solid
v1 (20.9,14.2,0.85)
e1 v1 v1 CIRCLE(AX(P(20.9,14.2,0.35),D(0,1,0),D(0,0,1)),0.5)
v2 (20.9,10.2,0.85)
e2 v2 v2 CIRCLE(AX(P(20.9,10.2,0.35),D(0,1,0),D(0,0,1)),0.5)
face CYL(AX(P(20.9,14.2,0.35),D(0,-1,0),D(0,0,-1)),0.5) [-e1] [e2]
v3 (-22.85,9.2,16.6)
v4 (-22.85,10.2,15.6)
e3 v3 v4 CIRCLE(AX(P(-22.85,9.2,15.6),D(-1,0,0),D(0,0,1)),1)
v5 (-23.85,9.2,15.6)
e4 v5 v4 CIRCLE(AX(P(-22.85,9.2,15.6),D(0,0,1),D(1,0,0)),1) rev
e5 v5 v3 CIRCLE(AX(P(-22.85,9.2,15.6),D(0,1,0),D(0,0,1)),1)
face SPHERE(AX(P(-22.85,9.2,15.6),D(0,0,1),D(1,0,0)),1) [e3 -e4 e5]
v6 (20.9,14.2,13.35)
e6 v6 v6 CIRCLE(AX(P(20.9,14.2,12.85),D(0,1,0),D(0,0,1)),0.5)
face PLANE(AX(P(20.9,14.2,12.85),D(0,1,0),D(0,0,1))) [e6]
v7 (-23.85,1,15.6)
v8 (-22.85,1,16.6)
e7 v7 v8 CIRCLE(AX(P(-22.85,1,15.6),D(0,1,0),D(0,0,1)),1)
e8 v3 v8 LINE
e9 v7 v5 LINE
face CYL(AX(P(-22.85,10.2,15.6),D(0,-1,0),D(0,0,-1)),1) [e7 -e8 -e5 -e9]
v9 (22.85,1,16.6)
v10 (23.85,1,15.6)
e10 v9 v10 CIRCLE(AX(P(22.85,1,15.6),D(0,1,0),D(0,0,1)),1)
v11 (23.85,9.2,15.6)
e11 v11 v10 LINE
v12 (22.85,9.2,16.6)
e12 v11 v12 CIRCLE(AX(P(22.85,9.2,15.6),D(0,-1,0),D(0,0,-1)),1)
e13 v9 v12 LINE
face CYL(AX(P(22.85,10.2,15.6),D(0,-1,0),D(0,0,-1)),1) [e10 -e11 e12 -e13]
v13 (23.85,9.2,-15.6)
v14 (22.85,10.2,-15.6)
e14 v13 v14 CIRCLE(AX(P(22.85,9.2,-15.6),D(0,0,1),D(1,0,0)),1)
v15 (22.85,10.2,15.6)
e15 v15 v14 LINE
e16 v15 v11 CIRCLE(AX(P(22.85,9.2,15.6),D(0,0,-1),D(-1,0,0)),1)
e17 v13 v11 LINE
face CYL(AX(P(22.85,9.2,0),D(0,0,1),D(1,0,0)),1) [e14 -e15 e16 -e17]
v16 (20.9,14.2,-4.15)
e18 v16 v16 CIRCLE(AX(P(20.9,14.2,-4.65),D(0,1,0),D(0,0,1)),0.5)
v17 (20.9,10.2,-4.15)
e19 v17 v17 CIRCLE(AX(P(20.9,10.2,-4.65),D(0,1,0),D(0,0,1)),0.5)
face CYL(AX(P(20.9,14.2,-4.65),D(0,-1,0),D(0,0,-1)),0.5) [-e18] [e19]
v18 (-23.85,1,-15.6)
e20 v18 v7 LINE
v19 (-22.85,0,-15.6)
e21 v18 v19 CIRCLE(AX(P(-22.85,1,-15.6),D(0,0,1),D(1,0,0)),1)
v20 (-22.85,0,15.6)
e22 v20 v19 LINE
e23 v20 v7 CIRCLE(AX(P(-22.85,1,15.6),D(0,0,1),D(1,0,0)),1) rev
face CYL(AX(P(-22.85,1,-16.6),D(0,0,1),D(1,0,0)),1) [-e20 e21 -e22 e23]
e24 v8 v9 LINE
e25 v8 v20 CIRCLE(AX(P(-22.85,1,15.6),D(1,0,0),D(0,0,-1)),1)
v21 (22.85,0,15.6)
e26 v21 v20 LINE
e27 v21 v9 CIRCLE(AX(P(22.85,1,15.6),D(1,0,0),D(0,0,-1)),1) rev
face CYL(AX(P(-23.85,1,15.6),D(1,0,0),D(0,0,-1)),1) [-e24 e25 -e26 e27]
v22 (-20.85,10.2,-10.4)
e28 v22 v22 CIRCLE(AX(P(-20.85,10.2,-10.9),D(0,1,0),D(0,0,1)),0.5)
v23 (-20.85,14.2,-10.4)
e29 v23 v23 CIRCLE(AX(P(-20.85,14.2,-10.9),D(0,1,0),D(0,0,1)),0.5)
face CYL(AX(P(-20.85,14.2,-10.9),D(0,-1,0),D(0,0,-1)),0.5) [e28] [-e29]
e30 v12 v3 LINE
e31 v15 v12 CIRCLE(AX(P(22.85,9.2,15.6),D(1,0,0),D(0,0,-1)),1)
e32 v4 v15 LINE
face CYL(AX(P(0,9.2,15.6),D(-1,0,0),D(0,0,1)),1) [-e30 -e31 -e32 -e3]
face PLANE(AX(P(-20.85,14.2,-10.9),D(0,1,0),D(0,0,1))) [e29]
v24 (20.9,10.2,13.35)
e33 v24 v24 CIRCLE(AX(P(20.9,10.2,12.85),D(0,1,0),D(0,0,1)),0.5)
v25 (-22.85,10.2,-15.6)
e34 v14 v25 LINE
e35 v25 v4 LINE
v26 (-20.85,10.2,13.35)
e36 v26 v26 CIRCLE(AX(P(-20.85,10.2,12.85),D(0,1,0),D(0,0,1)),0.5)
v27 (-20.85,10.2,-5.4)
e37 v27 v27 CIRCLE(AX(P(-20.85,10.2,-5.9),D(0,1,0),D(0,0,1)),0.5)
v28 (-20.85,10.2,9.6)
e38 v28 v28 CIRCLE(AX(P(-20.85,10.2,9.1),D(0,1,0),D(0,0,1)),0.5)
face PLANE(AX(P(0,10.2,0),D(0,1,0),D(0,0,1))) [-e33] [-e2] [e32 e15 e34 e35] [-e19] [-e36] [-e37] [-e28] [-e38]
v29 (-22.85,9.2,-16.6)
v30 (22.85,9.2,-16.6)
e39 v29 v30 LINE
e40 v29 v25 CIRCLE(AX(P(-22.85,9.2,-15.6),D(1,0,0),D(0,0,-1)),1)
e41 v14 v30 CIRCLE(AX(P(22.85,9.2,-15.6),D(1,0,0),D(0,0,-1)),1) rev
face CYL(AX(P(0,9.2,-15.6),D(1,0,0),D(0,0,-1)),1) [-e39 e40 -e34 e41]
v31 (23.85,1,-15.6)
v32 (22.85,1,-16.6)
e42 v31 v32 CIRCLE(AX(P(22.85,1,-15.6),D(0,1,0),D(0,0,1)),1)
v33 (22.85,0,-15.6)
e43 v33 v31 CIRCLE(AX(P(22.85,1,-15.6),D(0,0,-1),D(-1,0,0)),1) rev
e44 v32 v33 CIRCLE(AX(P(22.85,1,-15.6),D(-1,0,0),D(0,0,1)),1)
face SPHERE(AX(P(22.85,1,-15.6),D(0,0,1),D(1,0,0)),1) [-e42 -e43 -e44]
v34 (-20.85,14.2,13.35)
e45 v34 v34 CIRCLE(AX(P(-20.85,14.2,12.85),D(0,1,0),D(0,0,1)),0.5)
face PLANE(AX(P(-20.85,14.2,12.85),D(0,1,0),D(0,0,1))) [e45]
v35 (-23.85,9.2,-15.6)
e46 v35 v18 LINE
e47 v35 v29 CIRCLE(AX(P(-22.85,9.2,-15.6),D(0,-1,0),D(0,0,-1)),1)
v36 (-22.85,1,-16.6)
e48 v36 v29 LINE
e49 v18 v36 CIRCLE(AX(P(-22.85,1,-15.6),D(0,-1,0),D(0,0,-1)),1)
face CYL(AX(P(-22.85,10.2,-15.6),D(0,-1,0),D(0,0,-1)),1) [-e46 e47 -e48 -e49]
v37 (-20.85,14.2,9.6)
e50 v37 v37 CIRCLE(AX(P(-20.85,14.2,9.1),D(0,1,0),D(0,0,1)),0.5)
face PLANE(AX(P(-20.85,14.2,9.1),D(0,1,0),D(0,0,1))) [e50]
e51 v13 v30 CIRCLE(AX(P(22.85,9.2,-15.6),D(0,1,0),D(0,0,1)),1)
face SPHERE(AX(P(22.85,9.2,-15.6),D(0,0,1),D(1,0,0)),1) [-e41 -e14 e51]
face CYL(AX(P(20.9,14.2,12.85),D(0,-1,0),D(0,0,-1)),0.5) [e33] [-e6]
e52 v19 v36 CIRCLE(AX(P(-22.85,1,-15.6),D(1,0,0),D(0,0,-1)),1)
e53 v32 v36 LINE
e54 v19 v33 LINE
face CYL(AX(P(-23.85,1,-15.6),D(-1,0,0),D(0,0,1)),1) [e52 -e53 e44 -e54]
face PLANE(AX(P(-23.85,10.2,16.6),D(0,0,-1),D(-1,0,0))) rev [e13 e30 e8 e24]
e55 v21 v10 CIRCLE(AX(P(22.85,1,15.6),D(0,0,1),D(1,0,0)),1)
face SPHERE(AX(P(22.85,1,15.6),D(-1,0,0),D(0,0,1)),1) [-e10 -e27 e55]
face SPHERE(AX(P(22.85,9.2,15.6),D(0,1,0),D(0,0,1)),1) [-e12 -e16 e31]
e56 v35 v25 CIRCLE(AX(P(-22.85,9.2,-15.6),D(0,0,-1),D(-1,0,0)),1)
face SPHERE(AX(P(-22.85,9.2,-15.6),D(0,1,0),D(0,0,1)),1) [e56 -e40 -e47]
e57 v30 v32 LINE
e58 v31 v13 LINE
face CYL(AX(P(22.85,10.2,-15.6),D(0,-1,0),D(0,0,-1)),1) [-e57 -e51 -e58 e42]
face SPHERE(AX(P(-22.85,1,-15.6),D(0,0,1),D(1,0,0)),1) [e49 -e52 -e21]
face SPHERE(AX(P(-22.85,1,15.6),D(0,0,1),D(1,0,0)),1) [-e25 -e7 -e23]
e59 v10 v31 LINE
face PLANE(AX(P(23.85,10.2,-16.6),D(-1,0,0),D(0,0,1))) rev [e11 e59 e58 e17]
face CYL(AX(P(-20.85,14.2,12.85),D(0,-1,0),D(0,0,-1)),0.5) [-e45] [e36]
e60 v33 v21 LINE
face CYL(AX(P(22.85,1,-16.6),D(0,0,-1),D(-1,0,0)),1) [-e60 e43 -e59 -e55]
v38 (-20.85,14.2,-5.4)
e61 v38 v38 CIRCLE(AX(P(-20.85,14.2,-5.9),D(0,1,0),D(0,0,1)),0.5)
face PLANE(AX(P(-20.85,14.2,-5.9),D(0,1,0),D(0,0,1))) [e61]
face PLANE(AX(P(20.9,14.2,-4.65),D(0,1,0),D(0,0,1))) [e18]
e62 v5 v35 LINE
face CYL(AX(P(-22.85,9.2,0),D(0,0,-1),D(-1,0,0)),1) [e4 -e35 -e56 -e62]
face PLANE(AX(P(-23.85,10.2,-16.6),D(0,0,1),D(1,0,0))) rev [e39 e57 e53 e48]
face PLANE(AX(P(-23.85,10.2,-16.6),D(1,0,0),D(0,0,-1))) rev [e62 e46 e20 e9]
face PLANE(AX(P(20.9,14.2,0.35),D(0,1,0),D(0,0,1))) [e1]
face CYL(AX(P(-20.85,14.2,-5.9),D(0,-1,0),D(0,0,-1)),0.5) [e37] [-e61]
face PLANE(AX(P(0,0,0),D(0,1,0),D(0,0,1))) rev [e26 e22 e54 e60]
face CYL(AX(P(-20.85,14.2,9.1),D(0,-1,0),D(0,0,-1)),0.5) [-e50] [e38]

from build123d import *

# Parameters (mm, degrees)
SKETCH_1_W      = 47.7
SKETCH_1_H      = 33.2
EXTRUDE_1_DEPTH = 10.2
SKETCH_2_R      = 0.5
EXTRUDE_2_DEPTH = 4
FILLET_1_R      = 1
FILLET_2_R      = 1
FILLET_3_R      = 1
FILLET_4_R      = 1


with BuildPart() as part:
    # Эскиз1 → Бобышка-Вытянуть1 (new body)
    with BuildSketch(Plane(origin=(0, 0, 0), x_dir=(1, 0, 0), z_dir=(0, 1, 0))):
        Rectangle(SKETCH_1_W, SKETCH_1_H)
    extrude(amount=EXTRUDE_1_DEPTH)

    # Эскиз2 → Бобышка-Вытянуть2 (add)
    with BuildSketch(Plane(origin=(0, 10.2, 0), x_dir=(1, 0, 0), z_dir=(0, 1, 0))):
        with Locations(Location((-20.85, 5.9, 0), (0, 0, 270))):
            Circle(SKETCH_2_R)
        with Locations(Location((-20.85, 10.9, 0), (0, 0, 270))):
            Circle(SKETCH_2_R)
        with Locations(Location((-20.85, -12.85, 0), (0, 0, 270))):
            Circle(SKETCH_2_R)
        with Locations(Location((-20.85, -9.1, 0), (0, 0, 270))):
            Circle(SKETCH_2_R)
        with Locations(Location((20.9, -12.85, 0), (0, 0, 270))):
            Circle(SKETCH_2_R)
        with Locations(Location((20.9, -0.35, 0), (0, 0, 270))):
            Circle(SKETCH_2_R)
        with Locations(Location((20.9, 4.65, 0), (0, 0, 270))):
            Circle(SKETCH_2_R)
    extrude(amount=EXTRUDE_2_DEPTH)

    # Скругление1
    fillet_1_edges = [part.edges().sort_by_distance(p)[0] for p in [
        (0, 0, 16.6),
        (-23.85, 0, 0),
    ]]
    fillet(fillet_1_edges, radius=FILLET_1_R)

    # Скругление2
    fillet_2_edges = [part.edges().sort_by_distance(p)[0] for p in [
        (23.85, 0, -0.5),
        (-23.557106781, 0.292893219, -16.6),
        (23.85, 0.292893219, 16.307106781),
        (0.5, 0, -16.6),
        (23.85, 5.6, 16.6),
        (-23.85, 5.6, -16.6),
    ]]
    fillet(fillet_2_edges, radius=FILLET_2_R)

    # Скругление3
    # the kernel refuses this fillet: 1 mm, written as the material it takes off along each edge
    with BuildSketch(Plane(origin=(-22.85, 1, 15.6), x_dir=(0, 0, 1), z_dir=(-1, 0, 0))) as fillet_3_piece_1_section:
        Polygon((0, 0), (FILLET_3_R, 0), (FILLET_3_R, -FILLET_3_R), (0, -FILLET_3_R), align=None)
    fillet_3_piece_1 = extrude(amount=FILLET_3_R, mode=Mode.PRIVATE)
    fillet_3_piece_1 = fillet_3_piece_1 - Plane(origin=(-22.85, 1, 15.6), x_dir=(0, 0.7071067811865475, -0.7071067811865475), z_dir=(-1, 0, 0)) * Sphere(FILLET_3_R, mode=Mode.PRIVATE)
    add(fillet_3_piece_1, mode=Mode.SUBTRACT)
    with BuildSketch(Plane(origin=(-22.85, 9.2, 15.6), x_dir=(-1, 0, 0), z_dir=(0, 1, 0))) as fillet_3_piece_2_section:
        Polygon((0, 0), (FILLET_3_R, 0), (FILLET_3_R, FILLET_3_R), (0, FILLET_3_R), align=None)
    fillet_3_piece_2 = extrude(amount=FILLET_3_R, mode=Mode.PRIVATE)
    fillet_3_piece_2 = fillet_3_piece_2 - Plane(origin=(-22.85, 9.2, 15.6), x_dir=(0.7071067811865475, 0, -0.7071067811865475), z_dir=(0, 1, 0)) * Sphere(FILLET_3_R, mode=Mode.PRIVATE)
    add(fillet_3_piece_2, mode=Mode.SUBTRACT)
    with BuildSketch(Plane(origin=(22.85, 10.2, 16.6), x_dir=(0, 0, -1), z_dir=(-1, 0, 0))) as fillet_3_piece_3:
        with BuildLine():
            CenterArc((FILLET_3_R, FILLET_3_R), FILLET_3_R, 180, 90)
            Line((0, FILLET_3_R), (0, 0))
            Line((0, 0), (FILLET_3_R, 0))
        make_face()
    extrude(amount=45.7, mode=Mode.SUBTRACT)
    with BuildSketch(Plane(origin=(23.85, 10.2, -19.1), x_dir=(-1, 0, 0), z_dir=(0, 0, 1))) as fillet_3_piece_4:
        with BuildLine():
            CenterArc((FILLET_3_R, FILLET_3_R), FILLET_3_R, 180, 90)
            Line((0, FILLET_3_R), (0, 0))
            Line((0, 0), (FILLET_3_R, 0))
        make_face()
    extrude(amount=34.7, mode=Mode.SUBTRACT)
    with BuildSketch(Plane(origin=(-23.85, 10.2, 15.6), x_dir=(1, 0, 0), z_dir=(0, 0, -1))) as fillet_3_piece_5:
        with BuildLine():
            CenterArc((FILLET_3_R, FILLET_3_R), FILLET_3_R, 180, 90)
            Line((0, FILLET_3_R), (0, 0))
            Line((0, 0), (FILLET_3_R, 0))
        make_face()
    extrude(amount=31.2, mode=Mode.SUBTRACT)
    with BuildSketch(Plane(origin=(-22.85, 10.2, -15.6), x_dir=(0, 0, -1), z_dir=(1, 0, 0))) as fillet_3_piece_6:
        with BuildLine():
            CenterArc((1 - FILLET_3_R, -FILLET_3_R), FILLET_3_R, 0, 90)
            Line((1, -FILLET_3_R), (1, 0))
            Line((1, 0), (1 - FILLET_3_R, 0))
        make_face()
    revolve(axis=Axis((-22.85, 10.2, -15.6), (0, 1, 0)), revolution_arc=90, mode=Mode.SUBTRACT)
    with BuildSketch(Plane(origin=(22.85, 10.2, 15.6), x_dir=(0, 0, 1), z_dir=(-1, 0, 0))) as fillet_3_piece_7:
        with BuildLine():
            CenterArc((1 - FILLET_3_R, -FILLET_3_R), FILLET_3_R, 0, 90)
            Line((1, -FILLET_3_R), (1, 0))
            Line((1, 0), (1 - FILLET_3_R, 0))
        make_face()
    revolve(axis=Axis((22.85, 10.2, 15.6), (0, 1, 0)), revolution_arc=90, mode=Mode.SUBTRACT)
    with BuildSketch(Plane(origin=(-22.85, 10.2, -16.6), x_dir=(0, -1, 0), z_dir=(1, 0, 0))) as fillet_3_piece_8:
        with BuildLine():
            CenterArc((FILLET_3_R, -FILLET_3_R), FILLET_3_R, 90, 90)
            Line((0, -FILLET_3_R), (0, 0))
            Line((0, 0), (FILLET_3_R, 0))
        make_face()
    extrude(amount=49.2, mode=Mode.SUBTRACT)
    with BuildSketch(Plane(origin=(-23.85, 1, 16.6), x_dir=(0, 0, -1), z_dir=(0, 1, 0))) as fillet_3_piece_9:
        with BuildLine():
            CenterArc((FILLET_3_R, -FILLET_3_R), FILLET_3_R, 90, 90)
            Line((0, -FILLET_3_R), (0, 0))
            Line((0, 0), (FILLET_3_R, 0))
        make_face()
    extrude(amount=8.2, mode=Mode.SUBTRACT)

    # Скругление4
    # the kernel refuses this fillet: 1 mm, written as the material it takes off along each edge
    with BuildSketch(Plane(origin=(22.85, 1, -15.6), x_dir=(1, 0, 0), z_dir=(0, 0, -1))) as fillet_4_piece_1_section:
        Polygon((0, 0), (FILLET_4_R, 0), (FILLET_4_R, FILLET_4_R), (0, FILLET_4_R), align=None)
    fillet_4_piece_1 = extrude(amount=FILLET_4_R, mode=Mode.PRIVATE)
    fillet_4_piece_1 = fillet_4_piece_1 - Plane(origin=(22.85, 1, -15.6), x_dir=(-0.7071067811865475, 0.7071067811865475, 0), z_dir=(0, 0, -1)) * Sphere(FILLET_4_R, mode=Mode.PRIVATE)
    add(fillet_4_piece_1, mode=Mode.SUBTRACT)
    with BuildSketch(Plane(origin=(22.85, 9.2, -15.6), x_dir=(1, 0, 0), z_dir=(0, 0, -1))) as fillet_4_piece_2_section:
        Polygon((0, 0), (FILLET_4_R, 0), (FILLET_4_R, -FILLET_4_R), (0, -FILLET_4_R), align=None)
    fillet_4_piece_2 = extrude(amount=FILLET_4_R, mode=Mode.PRIVATE)
    fillet_4_piece_2 = fillet_4_piece_2 - Plane(origin=(22.85, 9.2, -15.6), x_dir=(-0.7071067811865475, -0.7071067811865475, 0), z_dir=(0, 0, -1)) * Sphere(FILLET_4_R, mode=Mode.PRIVATE)
    add(fillet_4_piece_2, mode=Mode.SUBTRACT)
    with BuildSketch(Plane(origin=(23.85, 1, -16.6), x_dir=(-1, 0, 0), z_dir=(0, 1, 0))) as fillet_4_piece_3:
        with BuildLine():
            CenterArc((FILLET_4_R, FILLET_4_R), FILLET_4_R, 180, 90)
            Line((0, FILLET_4_R), (0, 0))
            Line((0, 0), (FILLET_4_R, 0))
        make_face()
    extrude(amount=8.2, mode=Mode.SUBTRACT)


solid = part.part
